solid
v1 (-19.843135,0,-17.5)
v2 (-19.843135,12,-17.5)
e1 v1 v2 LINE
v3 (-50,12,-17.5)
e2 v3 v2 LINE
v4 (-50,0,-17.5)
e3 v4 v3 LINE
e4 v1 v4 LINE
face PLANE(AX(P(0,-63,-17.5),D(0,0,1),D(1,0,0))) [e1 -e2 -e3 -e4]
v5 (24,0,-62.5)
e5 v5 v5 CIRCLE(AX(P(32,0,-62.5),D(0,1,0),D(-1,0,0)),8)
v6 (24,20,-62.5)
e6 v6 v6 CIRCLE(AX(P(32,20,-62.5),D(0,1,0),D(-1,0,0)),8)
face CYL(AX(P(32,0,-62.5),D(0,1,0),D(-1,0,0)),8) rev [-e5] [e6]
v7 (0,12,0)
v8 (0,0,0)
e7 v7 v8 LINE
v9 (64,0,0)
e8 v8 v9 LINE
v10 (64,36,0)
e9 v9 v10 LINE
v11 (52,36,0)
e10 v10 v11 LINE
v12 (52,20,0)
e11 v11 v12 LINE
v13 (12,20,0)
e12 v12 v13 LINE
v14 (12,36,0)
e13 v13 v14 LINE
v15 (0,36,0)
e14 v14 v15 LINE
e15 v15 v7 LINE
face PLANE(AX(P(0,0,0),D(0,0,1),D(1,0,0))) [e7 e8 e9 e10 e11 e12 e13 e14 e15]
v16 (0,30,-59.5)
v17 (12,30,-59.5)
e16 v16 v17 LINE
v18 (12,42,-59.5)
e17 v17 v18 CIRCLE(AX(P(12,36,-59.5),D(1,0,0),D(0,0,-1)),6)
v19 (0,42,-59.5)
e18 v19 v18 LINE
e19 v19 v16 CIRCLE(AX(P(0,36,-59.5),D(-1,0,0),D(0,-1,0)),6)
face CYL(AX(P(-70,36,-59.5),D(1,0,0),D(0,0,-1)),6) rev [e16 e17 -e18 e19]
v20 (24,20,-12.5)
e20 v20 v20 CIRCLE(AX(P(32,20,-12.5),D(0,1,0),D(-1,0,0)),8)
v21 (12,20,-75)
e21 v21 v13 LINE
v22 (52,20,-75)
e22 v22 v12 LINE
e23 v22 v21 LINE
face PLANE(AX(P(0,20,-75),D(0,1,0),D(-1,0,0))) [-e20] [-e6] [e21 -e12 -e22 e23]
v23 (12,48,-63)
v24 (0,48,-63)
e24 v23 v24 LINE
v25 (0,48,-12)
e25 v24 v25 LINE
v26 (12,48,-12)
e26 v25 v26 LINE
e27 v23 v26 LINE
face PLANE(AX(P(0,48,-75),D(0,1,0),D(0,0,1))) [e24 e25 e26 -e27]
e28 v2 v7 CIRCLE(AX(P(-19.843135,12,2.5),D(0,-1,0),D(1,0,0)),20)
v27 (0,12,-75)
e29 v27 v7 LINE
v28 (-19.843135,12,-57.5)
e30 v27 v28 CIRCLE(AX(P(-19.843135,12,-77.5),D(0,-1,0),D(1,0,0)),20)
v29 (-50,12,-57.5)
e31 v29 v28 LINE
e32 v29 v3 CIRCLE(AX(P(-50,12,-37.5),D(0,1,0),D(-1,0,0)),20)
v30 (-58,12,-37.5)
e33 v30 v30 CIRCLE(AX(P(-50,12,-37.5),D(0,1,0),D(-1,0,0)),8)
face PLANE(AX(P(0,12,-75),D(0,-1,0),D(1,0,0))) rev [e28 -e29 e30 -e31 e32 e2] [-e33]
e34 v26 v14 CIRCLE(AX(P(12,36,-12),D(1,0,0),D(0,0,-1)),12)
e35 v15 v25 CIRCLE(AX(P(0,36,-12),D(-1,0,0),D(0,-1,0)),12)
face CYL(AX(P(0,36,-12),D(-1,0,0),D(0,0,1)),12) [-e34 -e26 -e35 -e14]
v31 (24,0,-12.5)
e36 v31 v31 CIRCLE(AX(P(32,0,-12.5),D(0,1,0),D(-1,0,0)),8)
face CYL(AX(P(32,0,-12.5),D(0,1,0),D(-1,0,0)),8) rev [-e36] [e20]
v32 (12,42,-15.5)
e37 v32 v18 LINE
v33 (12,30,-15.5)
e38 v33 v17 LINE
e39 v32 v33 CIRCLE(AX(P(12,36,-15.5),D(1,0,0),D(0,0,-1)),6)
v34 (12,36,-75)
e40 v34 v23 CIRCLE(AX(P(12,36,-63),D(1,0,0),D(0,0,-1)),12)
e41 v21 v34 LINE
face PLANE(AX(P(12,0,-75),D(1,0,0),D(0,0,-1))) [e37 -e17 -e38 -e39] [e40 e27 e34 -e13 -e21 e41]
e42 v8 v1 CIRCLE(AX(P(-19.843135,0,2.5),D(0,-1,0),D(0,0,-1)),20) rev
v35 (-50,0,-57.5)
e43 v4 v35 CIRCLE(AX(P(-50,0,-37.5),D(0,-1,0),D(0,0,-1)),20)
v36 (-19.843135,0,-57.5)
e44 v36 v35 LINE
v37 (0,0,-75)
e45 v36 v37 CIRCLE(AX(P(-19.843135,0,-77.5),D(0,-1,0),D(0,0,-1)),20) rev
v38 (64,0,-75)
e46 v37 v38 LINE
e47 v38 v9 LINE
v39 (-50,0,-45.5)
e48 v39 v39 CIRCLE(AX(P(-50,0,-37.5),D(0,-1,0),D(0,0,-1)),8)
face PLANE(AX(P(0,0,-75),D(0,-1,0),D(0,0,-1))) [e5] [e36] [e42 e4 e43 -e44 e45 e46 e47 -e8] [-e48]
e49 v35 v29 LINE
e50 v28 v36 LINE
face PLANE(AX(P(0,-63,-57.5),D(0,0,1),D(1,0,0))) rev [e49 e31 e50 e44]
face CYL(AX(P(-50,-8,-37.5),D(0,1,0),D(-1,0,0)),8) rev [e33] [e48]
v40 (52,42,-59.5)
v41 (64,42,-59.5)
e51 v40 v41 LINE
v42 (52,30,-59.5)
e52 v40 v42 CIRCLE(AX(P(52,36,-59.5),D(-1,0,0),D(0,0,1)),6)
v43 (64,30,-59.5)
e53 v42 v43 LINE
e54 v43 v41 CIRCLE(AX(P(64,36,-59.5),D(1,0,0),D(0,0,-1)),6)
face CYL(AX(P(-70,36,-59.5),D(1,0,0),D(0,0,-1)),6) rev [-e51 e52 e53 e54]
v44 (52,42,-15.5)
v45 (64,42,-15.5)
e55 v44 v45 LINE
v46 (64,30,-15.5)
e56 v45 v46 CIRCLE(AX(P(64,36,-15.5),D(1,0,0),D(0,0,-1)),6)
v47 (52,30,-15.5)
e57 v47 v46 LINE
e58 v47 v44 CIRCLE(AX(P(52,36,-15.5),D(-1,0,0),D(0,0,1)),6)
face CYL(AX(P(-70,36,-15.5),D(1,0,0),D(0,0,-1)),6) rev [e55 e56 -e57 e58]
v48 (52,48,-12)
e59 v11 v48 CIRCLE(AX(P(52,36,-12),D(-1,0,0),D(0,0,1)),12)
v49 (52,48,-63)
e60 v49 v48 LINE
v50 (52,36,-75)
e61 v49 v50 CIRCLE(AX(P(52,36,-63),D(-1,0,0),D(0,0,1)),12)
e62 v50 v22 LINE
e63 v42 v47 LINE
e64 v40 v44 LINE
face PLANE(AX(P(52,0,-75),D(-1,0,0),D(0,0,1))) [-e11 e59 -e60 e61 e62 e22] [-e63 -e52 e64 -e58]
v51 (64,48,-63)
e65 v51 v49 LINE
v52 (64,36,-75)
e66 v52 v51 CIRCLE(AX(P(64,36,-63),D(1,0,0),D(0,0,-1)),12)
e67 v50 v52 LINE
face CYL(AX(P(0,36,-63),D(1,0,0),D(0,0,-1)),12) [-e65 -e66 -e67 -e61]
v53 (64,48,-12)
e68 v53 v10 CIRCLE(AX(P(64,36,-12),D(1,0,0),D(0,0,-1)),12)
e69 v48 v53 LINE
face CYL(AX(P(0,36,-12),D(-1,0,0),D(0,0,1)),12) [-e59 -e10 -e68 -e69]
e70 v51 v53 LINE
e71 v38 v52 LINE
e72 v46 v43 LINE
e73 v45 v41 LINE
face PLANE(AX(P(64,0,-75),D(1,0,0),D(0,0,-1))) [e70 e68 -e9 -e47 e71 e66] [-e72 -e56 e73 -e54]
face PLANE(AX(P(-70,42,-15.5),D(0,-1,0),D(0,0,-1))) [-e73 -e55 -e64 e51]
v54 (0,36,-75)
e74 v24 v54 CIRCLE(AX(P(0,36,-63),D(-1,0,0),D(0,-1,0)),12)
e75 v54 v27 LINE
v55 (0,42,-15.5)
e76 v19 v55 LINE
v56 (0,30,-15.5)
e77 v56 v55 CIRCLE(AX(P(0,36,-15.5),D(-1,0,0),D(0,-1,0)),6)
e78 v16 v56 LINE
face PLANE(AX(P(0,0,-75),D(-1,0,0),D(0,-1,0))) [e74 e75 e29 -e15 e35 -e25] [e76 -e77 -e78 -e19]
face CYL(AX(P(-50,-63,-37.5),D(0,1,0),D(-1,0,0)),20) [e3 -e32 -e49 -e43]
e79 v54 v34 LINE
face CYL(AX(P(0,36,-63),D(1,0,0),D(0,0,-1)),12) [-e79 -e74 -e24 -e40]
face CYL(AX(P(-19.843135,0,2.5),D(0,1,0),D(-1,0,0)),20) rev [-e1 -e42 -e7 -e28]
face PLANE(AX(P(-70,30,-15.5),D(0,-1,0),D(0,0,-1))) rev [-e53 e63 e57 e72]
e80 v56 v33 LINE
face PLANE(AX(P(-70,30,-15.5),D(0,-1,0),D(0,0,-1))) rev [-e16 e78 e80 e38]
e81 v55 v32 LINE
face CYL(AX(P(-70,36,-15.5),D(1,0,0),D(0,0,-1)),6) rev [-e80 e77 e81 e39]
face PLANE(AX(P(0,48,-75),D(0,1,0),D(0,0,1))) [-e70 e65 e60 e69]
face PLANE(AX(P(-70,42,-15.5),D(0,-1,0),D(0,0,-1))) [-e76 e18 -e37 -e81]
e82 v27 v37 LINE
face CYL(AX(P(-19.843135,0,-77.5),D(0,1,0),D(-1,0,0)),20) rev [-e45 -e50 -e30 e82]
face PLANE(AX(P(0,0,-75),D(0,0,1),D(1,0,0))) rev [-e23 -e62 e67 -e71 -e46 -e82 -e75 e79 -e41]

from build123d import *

# Parameters (mm, degrees)
SKETCH2_W           = 70
SKETCH2_H           = 12
BOSS_EXTRUDE2_DEPTH = 75
CUT_EXTRUDE2_DEPTH  = 75
FILLET2_R           = 20
SKETCH11_R          = 8
CUT_EXTRUDE9_DEPTH  = 20
SKETCH13_R          = 8
CUT_EXTRUDE10_DEPTH = 107.343782141
CUT_EXTRUDE11_DEPTH = 161.888159912
FILLET3_R           = 12


with BuildPart() as part:
    # Sketch2 → Boss-Extrude2 (new body)
    with BuildSketch(Plane.XY):
        Polygon((12, 48), (0, 48), (0, 0), (64, 0), (64, 48), (52, 48), (52, 20), (12, 20), align=None)
        with Locations((-35, 6)):
            Rectangle(SKETCH2_W, SKETCH2_H)
    extrude(amount=-BOSS_EXTRUDE2_DEPTH)

    # Sketch4 → Cut-Extrude2 (cut)
    with BuildSketch(Plane(origin=(0, 12, 0), x_dir=(1, 0, 0), z_dir=(0, 1, 0))):
        with BuildLine():
            ThreePointArc((-70, 37.5), (-64.142135624, 51.642135624), (-50, 57.5))
            Line((-50, 57.5), (0, 57.5))
            Line((0, 57.5), (0, 75))
            Line((0, 75), (-70, 75))
            Line((-70, 75), (-70, 37.5))
        make_face()
        with BuildLine():
            ThreePointArc((-50, 17.5), (-64.142135624, 23.357864376), (-70, 37.5))
            Line((-70, 37.5), (-70, 0))
            Line((-70, 0), (0, 0))
            Line((0, 0), (0, 17.5))
            Line((0, 17.5), (-50, 17.5))
        make_face()
    extrude(amount=-CUT_EXTRUDE2_DEPTH, mode=Mode.SUBTRACT)

    # Fillet2
    # the kernel refuses this fillet: 20 mm, written as the material it adds along each edge
    with BuildSketch(Plane(origin=(0, 12, -57.5), x_dir=(-1, 0, 0), z_dir=(0, -1, 0))) as fillet2_piece_1:
        with BuildLine():
            CenterArc((19.843134833, 20), FILLET2_R, 187.180755781, 82.819244219)
            Line((0, 17.5), (-0.396862697, 17.45))
            ThreePointArc((-0.396862697, 17.45), (-0.4, 8.75), (-0.4, 0))
            Line((-0.4, 0), (0, -0.4))
            Line((0, -0.4), (19.843134833, -0.4))
            Line((19.843134833, -0.4), (19.843134833, 0))
        make_face()
    extrude(amount=12)
    with BuildSketch(Plane(origin=(0, 12, -17.5), x_dir=(-1, 0, 0), z_dir=(0, -1, 0))) as fillet2_piece_2:
        with BuildLine():
            CenterArc((19.843134833, -20), FILLET2_R, 90, 82.819244219)
            Line((0, -17.5), (-0.396862697, -17.45))
            ThreePointArc((-0.396862697, -17.45), (-0.4, -8.75), (-0.4, 0))
            Line((-0.4, 0), (0, 0.4))
            Line((0, 0.4), (19.843134833, 0.4))
            Line((19.843134833, 0.4), (19.843134833, 0))
        make_face()
    extrude(amount=12)

    # Sketch11 → Cut-Extrude9 (cut)
    with BuildSketch(Plane(origin=(0, 12, 0), x_dir=(1, 0, 0), z_dir=(0, 1, 0))):
        with Locations(Location((-50, 37.5, 0), (0, 0, 180))):
            Circle(SKETCH11_R)
    extrude(amount=-CUT_EXTRUDE9_DEPTH, mode=Mode.SUBTRACT)

    # Sketch13 → Cut-Extrude10 (cut, through all)
    with BuildSketch(Plane(origin=(0, 20, 0), x_dir=(1, 0, 0), z_dir=(0, 1, 0))):
        with Locations(Location((32, 62.5, 0), (0, 0, 180))):
            Circle(SKETCH13_R)
        with Locations(Location((32, 12.5, 0), (0, 0, 180))):
            Circle(SKETCH13_R)
    extrude(amount=-CUT_EXTRUDE10_DEPTH, mode=Mode.SUBTRACT)

    # Sketch14 → Cut-Extrude11 (cut, through all)
    with BuildSketch(Plane(origin=(64, 0, 0), x_dir=(0, 0, -1), z_dir=(1, 0, 0))):
        with BuildLine():
            Line((15.5, 42), (59.5, 42))
            ThreePointArc((59.5, 42), (65.5, 36), (59.5, 30))
            Line((59.5, 30), (15.5, 30))
            ThreePointArc((15.5, 30), (9.5, 36), (15.5, 42))
        make_face()
    extrude(amount=-CUT_EXTRUDE11_DEPTH, mode=Mode.SUBTRACT)

    # Fillet3
    fillet3_edges = [part.edges().sort_by_distance(p)[0] for p in [
        (58, 48, 0),
        (6, 48, 0),
        (6, 48, -75),
        (58, 48, -75),
    ]]
    fillet(fillet3_edges, radius=FILLET3_R)


solid = part.part
